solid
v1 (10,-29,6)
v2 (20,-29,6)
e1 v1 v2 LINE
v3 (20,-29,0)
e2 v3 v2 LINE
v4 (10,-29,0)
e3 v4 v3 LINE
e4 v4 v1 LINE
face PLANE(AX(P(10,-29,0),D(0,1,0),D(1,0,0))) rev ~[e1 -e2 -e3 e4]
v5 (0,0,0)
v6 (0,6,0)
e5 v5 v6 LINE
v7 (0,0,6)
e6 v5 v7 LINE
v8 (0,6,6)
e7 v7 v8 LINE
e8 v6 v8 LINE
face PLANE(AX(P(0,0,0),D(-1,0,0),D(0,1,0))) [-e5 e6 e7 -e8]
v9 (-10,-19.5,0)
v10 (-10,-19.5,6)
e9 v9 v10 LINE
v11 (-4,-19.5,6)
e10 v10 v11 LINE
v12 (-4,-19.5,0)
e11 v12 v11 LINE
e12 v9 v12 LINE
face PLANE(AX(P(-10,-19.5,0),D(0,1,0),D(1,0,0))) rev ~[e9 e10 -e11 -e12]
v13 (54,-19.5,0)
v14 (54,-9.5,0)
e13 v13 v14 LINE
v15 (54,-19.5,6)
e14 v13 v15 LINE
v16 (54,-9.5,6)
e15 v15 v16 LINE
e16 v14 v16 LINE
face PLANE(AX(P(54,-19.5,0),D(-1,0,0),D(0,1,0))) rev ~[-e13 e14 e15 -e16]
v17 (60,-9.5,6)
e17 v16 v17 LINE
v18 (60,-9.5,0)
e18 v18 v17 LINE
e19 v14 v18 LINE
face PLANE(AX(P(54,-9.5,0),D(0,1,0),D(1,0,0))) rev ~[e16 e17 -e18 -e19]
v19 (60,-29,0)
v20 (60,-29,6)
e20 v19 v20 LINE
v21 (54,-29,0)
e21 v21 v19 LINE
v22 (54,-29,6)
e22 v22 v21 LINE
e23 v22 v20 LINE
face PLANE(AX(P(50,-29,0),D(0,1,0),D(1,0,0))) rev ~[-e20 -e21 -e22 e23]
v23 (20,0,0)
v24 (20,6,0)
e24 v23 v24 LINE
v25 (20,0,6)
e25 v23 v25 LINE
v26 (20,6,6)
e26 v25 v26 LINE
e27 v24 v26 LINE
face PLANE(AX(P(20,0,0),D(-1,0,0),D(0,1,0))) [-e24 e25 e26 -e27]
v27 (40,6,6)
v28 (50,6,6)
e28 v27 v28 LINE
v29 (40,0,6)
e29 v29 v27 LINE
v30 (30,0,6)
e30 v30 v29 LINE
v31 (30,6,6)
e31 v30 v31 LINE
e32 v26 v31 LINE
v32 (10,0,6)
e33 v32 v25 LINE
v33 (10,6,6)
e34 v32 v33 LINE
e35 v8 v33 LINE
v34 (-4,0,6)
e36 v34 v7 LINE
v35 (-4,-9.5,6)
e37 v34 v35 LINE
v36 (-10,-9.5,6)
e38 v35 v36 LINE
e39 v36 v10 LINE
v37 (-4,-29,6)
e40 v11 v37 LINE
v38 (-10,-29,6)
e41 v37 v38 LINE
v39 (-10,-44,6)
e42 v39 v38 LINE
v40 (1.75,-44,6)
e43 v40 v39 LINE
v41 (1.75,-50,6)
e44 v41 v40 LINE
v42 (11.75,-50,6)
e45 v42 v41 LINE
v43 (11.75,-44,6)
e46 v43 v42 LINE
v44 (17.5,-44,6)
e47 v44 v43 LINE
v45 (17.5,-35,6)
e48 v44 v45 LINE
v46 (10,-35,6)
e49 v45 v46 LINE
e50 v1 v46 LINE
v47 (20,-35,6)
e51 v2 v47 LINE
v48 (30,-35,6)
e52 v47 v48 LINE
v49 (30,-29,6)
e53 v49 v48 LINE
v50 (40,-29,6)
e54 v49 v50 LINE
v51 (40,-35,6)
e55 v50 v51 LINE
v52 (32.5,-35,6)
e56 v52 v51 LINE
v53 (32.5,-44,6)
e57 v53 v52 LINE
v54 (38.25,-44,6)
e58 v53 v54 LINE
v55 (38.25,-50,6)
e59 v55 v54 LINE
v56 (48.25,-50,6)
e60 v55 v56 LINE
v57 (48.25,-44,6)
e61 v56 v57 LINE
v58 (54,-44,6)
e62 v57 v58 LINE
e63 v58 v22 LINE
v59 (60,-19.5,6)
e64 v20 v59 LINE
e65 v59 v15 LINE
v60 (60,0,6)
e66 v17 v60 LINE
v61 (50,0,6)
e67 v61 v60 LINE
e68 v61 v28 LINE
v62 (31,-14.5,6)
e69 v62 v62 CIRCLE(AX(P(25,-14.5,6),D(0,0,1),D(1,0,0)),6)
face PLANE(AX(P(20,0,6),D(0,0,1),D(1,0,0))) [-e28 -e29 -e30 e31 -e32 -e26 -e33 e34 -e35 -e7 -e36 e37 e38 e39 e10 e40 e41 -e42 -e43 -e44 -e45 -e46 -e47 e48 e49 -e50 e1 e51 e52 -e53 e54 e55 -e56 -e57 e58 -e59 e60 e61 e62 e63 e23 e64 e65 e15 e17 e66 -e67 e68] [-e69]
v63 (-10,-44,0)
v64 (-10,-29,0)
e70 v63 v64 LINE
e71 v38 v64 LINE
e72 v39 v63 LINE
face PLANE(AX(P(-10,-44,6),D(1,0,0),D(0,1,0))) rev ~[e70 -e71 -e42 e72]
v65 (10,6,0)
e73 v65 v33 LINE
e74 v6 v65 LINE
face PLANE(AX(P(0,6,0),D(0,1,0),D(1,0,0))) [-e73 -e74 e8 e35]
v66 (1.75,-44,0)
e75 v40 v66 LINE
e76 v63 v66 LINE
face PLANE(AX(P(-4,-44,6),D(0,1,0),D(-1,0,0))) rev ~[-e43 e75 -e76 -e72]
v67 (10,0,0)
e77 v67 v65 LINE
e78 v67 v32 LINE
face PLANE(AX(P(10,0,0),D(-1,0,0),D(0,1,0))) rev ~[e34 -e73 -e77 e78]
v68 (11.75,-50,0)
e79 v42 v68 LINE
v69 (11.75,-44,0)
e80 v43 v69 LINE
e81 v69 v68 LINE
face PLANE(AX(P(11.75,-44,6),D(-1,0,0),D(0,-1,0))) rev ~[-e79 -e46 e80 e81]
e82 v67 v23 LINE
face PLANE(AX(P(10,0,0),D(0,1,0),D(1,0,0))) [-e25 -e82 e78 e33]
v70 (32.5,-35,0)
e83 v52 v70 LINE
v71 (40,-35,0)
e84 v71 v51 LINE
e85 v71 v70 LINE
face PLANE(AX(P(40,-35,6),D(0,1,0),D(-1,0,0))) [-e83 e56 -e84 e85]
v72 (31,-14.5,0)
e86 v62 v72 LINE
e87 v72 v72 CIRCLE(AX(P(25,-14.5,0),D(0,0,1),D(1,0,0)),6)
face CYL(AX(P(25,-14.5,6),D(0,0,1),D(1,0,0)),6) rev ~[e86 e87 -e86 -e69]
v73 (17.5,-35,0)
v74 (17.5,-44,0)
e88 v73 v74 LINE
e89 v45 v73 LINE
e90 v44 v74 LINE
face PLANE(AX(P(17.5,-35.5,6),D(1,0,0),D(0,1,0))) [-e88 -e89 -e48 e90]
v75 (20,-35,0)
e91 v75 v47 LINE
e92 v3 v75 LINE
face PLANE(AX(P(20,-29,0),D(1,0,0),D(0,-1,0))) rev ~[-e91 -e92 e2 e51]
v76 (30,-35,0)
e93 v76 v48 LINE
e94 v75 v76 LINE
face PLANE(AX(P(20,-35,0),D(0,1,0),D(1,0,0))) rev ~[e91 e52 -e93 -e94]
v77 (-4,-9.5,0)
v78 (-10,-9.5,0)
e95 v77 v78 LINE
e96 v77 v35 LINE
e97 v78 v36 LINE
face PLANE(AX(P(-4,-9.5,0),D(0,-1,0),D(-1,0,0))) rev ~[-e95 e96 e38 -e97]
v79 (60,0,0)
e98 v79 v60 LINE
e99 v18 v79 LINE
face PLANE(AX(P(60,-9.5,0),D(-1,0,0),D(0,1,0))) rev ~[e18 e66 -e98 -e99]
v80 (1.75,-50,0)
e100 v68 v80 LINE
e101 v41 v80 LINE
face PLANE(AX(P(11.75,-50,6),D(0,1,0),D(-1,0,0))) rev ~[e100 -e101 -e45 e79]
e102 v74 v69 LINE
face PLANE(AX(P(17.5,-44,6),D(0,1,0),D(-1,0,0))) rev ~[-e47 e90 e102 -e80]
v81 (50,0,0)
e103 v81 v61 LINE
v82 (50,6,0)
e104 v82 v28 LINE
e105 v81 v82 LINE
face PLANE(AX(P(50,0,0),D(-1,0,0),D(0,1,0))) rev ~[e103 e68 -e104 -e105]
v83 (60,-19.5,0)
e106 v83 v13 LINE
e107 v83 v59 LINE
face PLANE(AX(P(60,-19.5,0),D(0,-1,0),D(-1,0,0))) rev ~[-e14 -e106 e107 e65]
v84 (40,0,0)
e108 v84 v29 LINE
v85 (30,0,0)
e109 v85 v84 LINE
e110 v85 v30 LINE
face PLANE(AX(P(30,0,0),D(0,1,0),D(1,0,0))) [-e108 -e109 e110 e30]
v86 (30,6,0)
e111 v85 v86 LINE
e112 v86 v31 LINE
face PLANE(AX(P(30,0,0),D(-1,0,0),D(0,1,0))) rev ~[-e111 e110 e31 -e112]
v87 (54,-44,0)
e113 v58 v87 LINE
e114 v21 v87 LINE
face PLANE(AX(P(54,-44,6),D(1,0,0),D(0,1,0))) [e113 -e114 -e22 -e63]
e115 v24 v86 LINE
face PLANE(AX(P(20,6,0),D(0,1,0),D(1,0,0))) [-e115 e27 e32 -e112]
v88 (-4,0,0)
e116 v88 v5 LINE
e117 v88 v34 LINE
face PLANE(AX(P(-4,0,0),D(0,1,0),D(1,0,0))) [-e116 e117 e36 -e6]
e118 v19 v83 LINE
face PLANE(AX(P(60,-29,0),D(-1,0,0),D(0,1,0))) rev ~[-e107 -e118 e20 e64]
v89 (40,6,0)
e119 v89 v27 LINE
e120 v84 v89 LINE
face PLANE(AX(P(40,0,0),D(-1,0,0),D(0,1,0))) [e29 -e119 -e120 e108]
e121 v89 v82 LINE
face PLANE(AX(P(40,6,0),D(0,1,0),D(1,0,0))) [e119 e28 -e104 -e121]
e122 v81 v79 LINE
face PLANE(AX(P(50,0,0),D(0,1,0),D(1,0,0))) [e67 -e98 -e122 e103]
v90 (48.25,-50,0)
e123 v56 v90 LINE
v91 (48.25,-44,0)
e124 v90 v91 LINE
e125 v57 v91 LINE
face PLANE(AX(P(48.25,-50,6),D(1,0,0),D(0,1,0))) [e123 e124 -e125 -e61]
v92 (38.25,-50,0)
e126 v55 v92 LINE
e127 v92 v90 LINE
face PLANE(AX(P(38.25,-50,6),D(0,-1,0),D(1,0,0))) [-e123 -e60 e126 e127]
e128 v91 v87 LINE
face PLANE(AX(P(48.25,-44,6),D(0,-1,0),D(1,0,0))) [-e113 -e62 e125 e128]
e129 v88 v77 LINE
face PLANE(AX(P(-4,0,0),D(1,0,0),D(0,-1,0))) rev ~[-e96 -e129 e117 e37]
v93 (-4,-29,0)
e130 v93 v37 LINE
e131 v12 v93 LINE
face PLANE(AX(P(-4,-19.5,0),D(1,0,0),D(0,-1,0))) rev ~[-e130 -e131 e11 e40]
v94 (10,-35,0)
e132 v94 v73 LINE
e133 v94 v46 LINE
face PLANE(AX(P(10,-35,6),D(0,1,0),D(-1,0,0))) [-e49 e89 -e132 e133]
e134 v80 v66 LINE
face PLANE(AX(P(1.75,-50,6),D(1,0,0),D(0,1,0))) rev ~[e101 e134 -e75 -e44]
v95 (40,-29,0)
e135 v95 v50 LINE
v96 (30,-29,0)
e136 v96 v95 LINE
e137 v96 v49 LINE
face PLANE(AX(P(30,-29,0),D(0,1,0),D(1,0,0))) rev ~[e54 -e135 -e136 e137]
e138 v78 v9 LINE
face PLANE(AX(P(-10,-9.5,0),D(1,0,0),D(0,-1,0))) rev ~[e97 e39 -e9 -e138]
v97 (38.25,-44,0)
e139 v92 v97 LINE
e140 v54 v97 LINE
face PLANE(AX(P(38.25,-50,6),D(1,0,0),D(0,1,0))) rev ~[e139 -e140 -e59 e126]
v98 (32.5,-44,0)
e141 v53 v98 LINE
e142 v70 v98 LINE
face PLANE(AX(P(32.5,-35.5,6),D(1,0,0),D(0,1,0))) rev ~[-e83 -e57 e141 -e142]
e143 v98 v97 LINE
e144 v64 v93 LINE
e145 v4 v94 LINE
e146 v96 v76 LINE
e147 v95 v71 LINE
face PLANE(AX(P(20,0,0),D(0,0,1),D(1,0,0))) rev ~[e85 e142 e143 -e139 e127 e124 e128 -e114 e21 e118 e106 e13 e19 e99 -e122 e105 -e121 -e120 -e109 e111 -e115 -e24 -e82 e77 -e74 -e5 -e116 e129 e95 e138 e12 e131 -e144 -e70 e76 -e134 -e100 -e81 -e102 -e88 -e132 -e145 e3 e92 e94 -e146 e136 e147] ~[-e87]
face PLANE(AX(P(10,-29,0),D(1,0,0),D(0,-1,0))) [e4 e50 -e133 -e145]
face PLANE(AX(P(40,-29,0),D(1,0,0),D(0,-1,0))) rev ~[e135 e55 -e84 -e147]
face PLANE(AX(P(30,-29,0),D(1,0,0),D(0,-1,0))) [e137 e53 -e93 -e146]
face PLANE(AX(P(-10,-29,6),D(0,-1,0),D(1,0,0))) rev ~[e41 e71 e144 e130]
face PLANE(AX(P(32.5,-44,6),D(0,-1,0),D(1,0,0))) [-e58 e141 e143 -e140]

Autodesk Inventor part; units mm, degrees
ref_plane "YZ Plane" through (0, 0, 0) normal (1, 0, 0) x (0, 1, 0)
ref_plane "XZ Plane" through (0, 0, 0) normal (0, 1, 0) x (-1, 0, 0)
ref_plane "XY Plane" through (0, 0, 0) normal (0, 0, 1) x (1, 0, 0)
ref_plane "Work Plane1" through (20, 0, 0) normal (0, 0, 1) x (1, 0, 0)
sketch "Sketch1" plane through (20, 0, 0) normal (0, 0, 1) x (1, 0, 0)
  line L0 (-20, 0) -> (-10, 0)
  line L1 (-10, 0) -> (-10, 6)
  line L2 (-20, 6) -> (-10, 6)
  line L3 (-20, 0) -> (-20, 6)
  line L4 (0, 0) -> (10, 0)
  line L5 (10, 0) -> (10, 6)
  line L6 (0, 6) -> (10, 6)
  line L7 (0, 0) -> (0, 6)
  line L8 (20, 0) -> (30, 0)
  line L9 (30, 0) -> (30, 6)
  line L10 (20, 6) -> (30, 6)
  line L11 (20, 0) -> (20, 6)
  line L12 (-30, 0) -> (-24, 0)
  line L13 (-24, 0) -> (-24, 6)
  line L14 (-30, 6) -> (-24, 6)
  line L15 (-30, 0) -> (-30, 6)
  line L16 (-30, 0) -> (-20, 0)
  line L17 (-10, 0) -> (0, 0)
  line L18 (10, 0) -> (20, 0)
  line L19 (30, 0) -> (40, 0)
  line L20 (40, 0) -> (-24, 0)
  line L21 (-24, 0) -> (-24, -29)
  line L22 (-24, -29) -> (40, -29)
  line L23 (40, -29) -> (40, 0)
  line L24 (-24, -9.5) -> (-30, -9.5)
  line L25 (-30, -9.5) -> (-30, -19.5)
  line L26 (-30, -19.5) -> (-24, -19.5)
  line L27 (-24, -19.5) -> (-24, -9.5)
  line L28 (40, -19.5) -> (34, -19.5)
  line L29 (34, -19.5) -> (34, -9.5)
  line L30 (34, -9.5) -> (40, -9.5)
  line L31 (40, -9.5) -> (40, -19.5)
  line L32 (-24, -14.5) -> (40, -14.5) construction
  line L33 (-20, -29) -> (-10, -29)
  line L34 (-10, -29) -> (-10, -35)
  line L35 (-20, -35) -> (-10, -35)
  line L36 (-20, -29) -> (-20, -35)
  line L37 (0, -29) -> (10, -29)
  line L38 (10, -29) -> (10, -35)
  line L39 (0, -35) -> (10, -35)
  line L40 (0, -29) -> (0, -35)
  line L41 (20, -29) -> (30, -29)
  line L42 (30, -29) -> (30, -35)
  line L43 (20, -35) -> (30, -35)
  line L44 (20, -29) -> (20, -35)
  line L45 (-10, -29) -> (0, -29)
  line L46 (10, -29) -> (20, -29)
  point P0 (-30, -14.5)
  point P1 (34, -14.5)
  dimension "d0" = 29
  dimension "d1" = 6
  dimension "d2" = 10
extrude "Plate1" add sketch "Sketch1" along normal blind 6 contours L3 L2 L1 L0 | L0 L17 L4 L18 L8 L19 L23 L30 L29 L28 L22 L21 L16 | L7 L6 L5 L4 | L21 L26 L25 L24 | L11 L10 L9 L8 | L22 L34 L35 L36 | L22 L38 L39 L40 | L22 L42 L43 L44
sketch "Sketch2" plane through (20, 0, 6) normal (0, 0, 1) x (1, 0, 0)
  line L0 (-24, -44) -> (-24, -29)
  line L1 (-18.25, -44) -> (-30, -44)
  line L2 (-2.5, -44) -> (-8.25, -44)
  line L3 (-2.5, -35.5) -> (-2.5, -44)
  line L4 (12, -35) -> (-2, -35)
  line L5 (10, -35) -> (0, -35) construction
  line L6 (5, -35) -> (5, 6) construction
  line L7 (0, 6) -> (10, 6) construction
  line L8 (40, -19.5) -> (34, -19.5)
  line L9 (34, -19.5) -> (34, -9.5)
  line L10 (34, -9.5) -> (40, -9.5)
  line L11 (40, 0) -> (40, -9.5)
  line L12 (30, 0) -> (40, 0)
  line L13 (30, 6) -> (30, 0)
  line L14 (20, 6) -> (30, 6)
  line L15 (20, 0) -> (20, 6)
  line L16 (10, 0) -> (20, 0)
  line L17 (10, 6) -> (10, 0)
  line L18 (0, 6) -> (10, 6)
  line L19 (0, 0) -> (0, 6)
  line L20 (-10, 0) -> (0, 0)
  line L21 (-10, 6) -> (-10, 0)
  line L22 (-20, 6) -> (-10, 6)
  line L23 (-20, 0) -> (-20, 6)
  line L24 (-24, 0) -> (-20, 0)
  line L25 (-24, -9.5) -> (-24, 0)
  line L26 (-30, -9.5) -> (-24, -9.5)
  line L27 (-30, -19.5) -> (-30, -9.5)
  line L28 (-24, -19.5) -> (-30, -19.5)
  line L29 (-24, -29) -> (-24, -19.5)
  line L30 (-20, -29) -> (-24, -29)
  line L31 (-20, -35) -> (-20, -29)
  line L32 (-10, -35) -> (-20, -35)
  line L33 (-10, -29) -> (-10, -35)
  line L34 (0, -29) -> (-10, -29)
  line L35 (0, -35) -> (0, -29)
  line L36 (10, -35) -> (0, -35)
  line L37 (10, -29) -> (10, -35)
  line L38 (20, -29) -> (10, -29)
  line L39 (20, -35) -> (20, -29)
  line L40 (30, -35) -> (20, -35)
  line L41 (30, -29) -> (30, -35)
  line L42 (40, -29) -> (30, -29)
  line L43 (40, -19.5) -> (40, -29)
  line L44 (-2.5, -44) -> (-2.5, -35)
  line L45 (-2.5, -35) -> (0, -35)
  line L46 (-8.25, -50) -> (-18.25, -50)
  line L47 (-18.25, -50) -> (-18.25, -44)
  line L48 (34, -44) -> (34, -29)
  line L49 (12.5, -44) -> (18.25, -44)
  line L50 (12.5, -35.5) -> (12.5, -44)
  line L51 (30, -29) -> (34, -29)
  line L52 (30, -35) -> (30, -29)
  line L53 (20, -35) -> (30, -35)
  line L54 (20, -29) -> (20, -35)
  line L55 (10, -29) -> (20, -29)
  line L56 (10, -35) -> (10, -29)
  line L57 (12.5, -44) -> (12.5, -35)
  line L58 (12.5, -35) -> (10, -35)
  line L59 (18.25, -50) -> (28.25, -50)
  line L60 (28.25, -50) -> (28.25, -44)
  line L61 (28.25, -44) -> (34, -44)
  line L62 (-24, -29) -> (-20, -29)
  line L63 (-20, -35) -> (-20, -29)
  line L64 (-20, -35) -> (-20, -29)
  line L65 (-20, -35) -> (-10, -35)
  line L66 (-10, -35) -> (-10, -29)
  line L67 (0, -29) -> (-10, -29)
  line L68 (0, -29) -> (0, -35)
  line L69 (-8.25, -44) -> (-8.25, -50)
  line L70 (18.25, -50) -> (18.25, -44)
  line L71 (34, -44) -> (34, -29)
  line L72 (28.25, -44) -> (40, -44)
  line L73 (12.5, -44) -> (18.25, -44)
  line L74 (12.5, -35.5) -> (12.5, -44)
  line L75 (30, -29) -> (34, -29)
  line L76 (30, -35) -> (30, -29)
  line L77 (20, -35) -> (30, -35)
  line L78 (20, -29) -> (20, -35)
  line L79 (10, -29) -> (20, -29)
  line L80 (10, -35) -> (10, -29)
  line L81 (12.5, -44) -> (12.5, -35)
  line L82 (12.5, -35) -> (10, -35)
  line L83 (18.25, -50) -> (28.25, -50)
  line L84 (28.25, -50) -> (28.25, -44)
  line L85 (34, -29) -> (30, -29)
  line L86 (30, -35) -> (30, -29)
  line L87 (30, -35) -> (30, -29)
  line L88 (30, -35) -> (20, -35)
  line L89 (20, -35) -> (20, -29)
  line L90 (10, -29) -> (20, -29)
  line L91 (10, -29) -> (10, -35)
  line L92 (18.25, -44) -> (18.25, -50)
  line L93 (-24, -44) -> (-30, -44)
  line L94 (-30, -44) -> (-30, -29)
  line L95 (-30, -29) -> (-24, -29)
  line L96 (-24, -29) -> (-24, -44)
  line L97 (-10, -29) -> (0, -29)
  line L98 (0, -29) -> (0, -35)
  line L99 (0, -35) -> (-10, -35)
  line L100 (-10, -35) -> (-10, -29)
  line L101 (20, -29) -> (10, -29)
  line L102 (10, -29) -> (20, -29)
  line L103 (20, -29) -> (20, -35)
  line L104 (20, -35) -> (10, -35)
  line L105 (10, -35) -> (10, -29)
  line L106 (30, -29) -> (34, -29)
  line L107 (34, -29) -> (34, -35)
  line L108 (34, -35) -> (30, -35)
  line L109 (30, -35) -> (30, -29)
  line L110 (-20, -29) -> (-24, -29)
  line L111 (-24, -29) -> (-24, -35)
  line L112 (-24, -35) -> (-20, -35)
  line L113 (-20, -35) -> (-20, -29)
  line L114 (30, -35) -> (20, -35)
  point P0 (-2.5, -49.5)
  point P1 (12.5, -49.5)
  point P2 (12.5, -49.5)
  dimension "d4" = 10
  dimension "d6" = 6
  dimension "d12" = 6
  dimension "d13" = 15
sheet face with bend "Face2" sketch "Sketch2" thickness 6 toward (0, 0, -1) bend radius 6 contours L1 L94 L95 L0 | L0 L112 L32 L99 L44 L3 L2 L69 L46 L47 L1 | L0 L30 L31 L112 | L104 L40 L108 L48 L61 L60 L59 L70 L49 L50 L57 | L41 L42 L48 L108
bend "Bend1"
sketch "Sketch3" plane through (20, 0, 6) normal (0, 0, 1) x (1, 0, 0)
  line L0 (40, -19.5) -> (34, -19.5) projected
  line L1 (34, -19.5) -> (34, -9.5) projected
  line L2 (34, -9.5) -> (40, -9.5) projected
  line L3 (40, 0) -> (40, -9.5) projected
  line L4 (30, 0) -> (40, 0) projected
  line L5 (30, 6) -> (30, 0) projected
  line L6 (20, 6) -> (30, 6) projected
  line L7 (20, 0) -> (20, 6) projected
  line L8 (10, 0) -> (20, 0) projected
  line L9 (10, 6) -> (10, 0) projected
  line L10 (0, 6) -> (10, 6) projected
  line L11 (0, 0) -> (0, 6) projected
  line L12 (-10, 0) -> (0, 0) projected
  line L13 (-10, 6) -> (-10, 0) projected
  line L14 (-20, 6) -> (-10, 6) projected
  line L15 (-20, 0) -> (-20, 6) projected
  line L16 (-24, 0) -> (-20, 0) projected
  line L17 (-24, -9.5) -> (-24, 0) projected
  line L18 (-30, -9.5) -> (-24, -9.5) projected
  line L19 (-30, -19.5) -> (-30, -9.5) projected
  line L20 (-24, -19.5) -> (-30, -19.5) projected
  line L21 (-24, -29) -> (-24, -19.5) projected
  line L22 (-24, -29) -> (-30, -29) projected
  line L23 (-30, -29) -> (-30, -44) projected
  line L24 (-30, -44) -> (-18.25, -44) projected
  line L25 (-18.25, -44) -> (-18.25, -50) projected
  line L26 (-18.25, -50) -> (-8.25, -50) projected
  line L27 (-8.25, -50) -> (-8.25, -44) projected
  line L28 (-8.25, -44) -> (-2.5, -44) projected
  line L29 (-2.5, -44) -> (-2.5, -35) projected
  line L30 (-2.5, -35) -> (-10, -35) projected
  line L31 (-10, -29) -> (-10, -35) projected
  line L32 (0, -29) -> (-10, -29) projected
  line L33 (0, -35) -> (0, -29) projected
  line L34 (10, -35) -> (0, -35) projected
  line L35 (10, -29) -> (10, -35) projected
  line L36 (20, -29) -> (10, -29) projected
  line L37 (20, -35) -> (20, -29) projected
  line L38 (20, -35) -> (12.5, -35) projected
  line L39 (12.5, -35) -> (12.5, -44) projected
  line L40 (12.5, -44) -> (18.25, -44) projected
  line L41 (18.25, -44) -> (18.25, -50) projected
  line L42 (18.25, -50) -> (28.25, -50) projected
  line L43 (28.25, -50) -> (28.25, -44) projected
  line L44 (28.25, -44) -> (34, -44) projected
  line L45 (34, -44) -> (34, -29) projected
  line L46 (40, -29) -> (34, -29) projected
  line L47 (40, -19.5) -> (40, -29) projected
  circle A0 centre (5, -14.5) radius 6
  point P0 (5, 6)
  point P1 (34, -14.5)
  dimension "d14" = 12
extrude "Cut1" cut sketch "Sketch3" against normal blind 6 contours A0
equation "\"d12\" = d6"
equation "\"d15\" = Thickness"
equation "\"d3\" = Thickness"
equation "\"d7\" = BendRadius"
equation "\"d8\" = BendReliefWidth"
equation "\"d10\" = MinimumRemnant"
equation "\"d9\" = BendReliefDepth"
equation "\"d11\" = TransitionRadius"
equation "\"BendRadius\" = Thickness"
equation "\"BendReliefWidth\" = Thickness"
equation "\"BendReliefDepth\" = 0.5 * Thickness"
equation "\"CornerReliefSize\" = 4 * Thickness"
equation "\"MinimumRemnant\" = 2 * Thickness"
equation "\"TransitionRadius\" = BendRadius"
equation "\"JacobiRadiusSize\" = BendRadius"
equation "\"GapSize\" = Thickness"
equation "\"Thickness\" = 6"
properties part number "jotstick behuizing zijkant 2.1" material "Wood (Birch)"
